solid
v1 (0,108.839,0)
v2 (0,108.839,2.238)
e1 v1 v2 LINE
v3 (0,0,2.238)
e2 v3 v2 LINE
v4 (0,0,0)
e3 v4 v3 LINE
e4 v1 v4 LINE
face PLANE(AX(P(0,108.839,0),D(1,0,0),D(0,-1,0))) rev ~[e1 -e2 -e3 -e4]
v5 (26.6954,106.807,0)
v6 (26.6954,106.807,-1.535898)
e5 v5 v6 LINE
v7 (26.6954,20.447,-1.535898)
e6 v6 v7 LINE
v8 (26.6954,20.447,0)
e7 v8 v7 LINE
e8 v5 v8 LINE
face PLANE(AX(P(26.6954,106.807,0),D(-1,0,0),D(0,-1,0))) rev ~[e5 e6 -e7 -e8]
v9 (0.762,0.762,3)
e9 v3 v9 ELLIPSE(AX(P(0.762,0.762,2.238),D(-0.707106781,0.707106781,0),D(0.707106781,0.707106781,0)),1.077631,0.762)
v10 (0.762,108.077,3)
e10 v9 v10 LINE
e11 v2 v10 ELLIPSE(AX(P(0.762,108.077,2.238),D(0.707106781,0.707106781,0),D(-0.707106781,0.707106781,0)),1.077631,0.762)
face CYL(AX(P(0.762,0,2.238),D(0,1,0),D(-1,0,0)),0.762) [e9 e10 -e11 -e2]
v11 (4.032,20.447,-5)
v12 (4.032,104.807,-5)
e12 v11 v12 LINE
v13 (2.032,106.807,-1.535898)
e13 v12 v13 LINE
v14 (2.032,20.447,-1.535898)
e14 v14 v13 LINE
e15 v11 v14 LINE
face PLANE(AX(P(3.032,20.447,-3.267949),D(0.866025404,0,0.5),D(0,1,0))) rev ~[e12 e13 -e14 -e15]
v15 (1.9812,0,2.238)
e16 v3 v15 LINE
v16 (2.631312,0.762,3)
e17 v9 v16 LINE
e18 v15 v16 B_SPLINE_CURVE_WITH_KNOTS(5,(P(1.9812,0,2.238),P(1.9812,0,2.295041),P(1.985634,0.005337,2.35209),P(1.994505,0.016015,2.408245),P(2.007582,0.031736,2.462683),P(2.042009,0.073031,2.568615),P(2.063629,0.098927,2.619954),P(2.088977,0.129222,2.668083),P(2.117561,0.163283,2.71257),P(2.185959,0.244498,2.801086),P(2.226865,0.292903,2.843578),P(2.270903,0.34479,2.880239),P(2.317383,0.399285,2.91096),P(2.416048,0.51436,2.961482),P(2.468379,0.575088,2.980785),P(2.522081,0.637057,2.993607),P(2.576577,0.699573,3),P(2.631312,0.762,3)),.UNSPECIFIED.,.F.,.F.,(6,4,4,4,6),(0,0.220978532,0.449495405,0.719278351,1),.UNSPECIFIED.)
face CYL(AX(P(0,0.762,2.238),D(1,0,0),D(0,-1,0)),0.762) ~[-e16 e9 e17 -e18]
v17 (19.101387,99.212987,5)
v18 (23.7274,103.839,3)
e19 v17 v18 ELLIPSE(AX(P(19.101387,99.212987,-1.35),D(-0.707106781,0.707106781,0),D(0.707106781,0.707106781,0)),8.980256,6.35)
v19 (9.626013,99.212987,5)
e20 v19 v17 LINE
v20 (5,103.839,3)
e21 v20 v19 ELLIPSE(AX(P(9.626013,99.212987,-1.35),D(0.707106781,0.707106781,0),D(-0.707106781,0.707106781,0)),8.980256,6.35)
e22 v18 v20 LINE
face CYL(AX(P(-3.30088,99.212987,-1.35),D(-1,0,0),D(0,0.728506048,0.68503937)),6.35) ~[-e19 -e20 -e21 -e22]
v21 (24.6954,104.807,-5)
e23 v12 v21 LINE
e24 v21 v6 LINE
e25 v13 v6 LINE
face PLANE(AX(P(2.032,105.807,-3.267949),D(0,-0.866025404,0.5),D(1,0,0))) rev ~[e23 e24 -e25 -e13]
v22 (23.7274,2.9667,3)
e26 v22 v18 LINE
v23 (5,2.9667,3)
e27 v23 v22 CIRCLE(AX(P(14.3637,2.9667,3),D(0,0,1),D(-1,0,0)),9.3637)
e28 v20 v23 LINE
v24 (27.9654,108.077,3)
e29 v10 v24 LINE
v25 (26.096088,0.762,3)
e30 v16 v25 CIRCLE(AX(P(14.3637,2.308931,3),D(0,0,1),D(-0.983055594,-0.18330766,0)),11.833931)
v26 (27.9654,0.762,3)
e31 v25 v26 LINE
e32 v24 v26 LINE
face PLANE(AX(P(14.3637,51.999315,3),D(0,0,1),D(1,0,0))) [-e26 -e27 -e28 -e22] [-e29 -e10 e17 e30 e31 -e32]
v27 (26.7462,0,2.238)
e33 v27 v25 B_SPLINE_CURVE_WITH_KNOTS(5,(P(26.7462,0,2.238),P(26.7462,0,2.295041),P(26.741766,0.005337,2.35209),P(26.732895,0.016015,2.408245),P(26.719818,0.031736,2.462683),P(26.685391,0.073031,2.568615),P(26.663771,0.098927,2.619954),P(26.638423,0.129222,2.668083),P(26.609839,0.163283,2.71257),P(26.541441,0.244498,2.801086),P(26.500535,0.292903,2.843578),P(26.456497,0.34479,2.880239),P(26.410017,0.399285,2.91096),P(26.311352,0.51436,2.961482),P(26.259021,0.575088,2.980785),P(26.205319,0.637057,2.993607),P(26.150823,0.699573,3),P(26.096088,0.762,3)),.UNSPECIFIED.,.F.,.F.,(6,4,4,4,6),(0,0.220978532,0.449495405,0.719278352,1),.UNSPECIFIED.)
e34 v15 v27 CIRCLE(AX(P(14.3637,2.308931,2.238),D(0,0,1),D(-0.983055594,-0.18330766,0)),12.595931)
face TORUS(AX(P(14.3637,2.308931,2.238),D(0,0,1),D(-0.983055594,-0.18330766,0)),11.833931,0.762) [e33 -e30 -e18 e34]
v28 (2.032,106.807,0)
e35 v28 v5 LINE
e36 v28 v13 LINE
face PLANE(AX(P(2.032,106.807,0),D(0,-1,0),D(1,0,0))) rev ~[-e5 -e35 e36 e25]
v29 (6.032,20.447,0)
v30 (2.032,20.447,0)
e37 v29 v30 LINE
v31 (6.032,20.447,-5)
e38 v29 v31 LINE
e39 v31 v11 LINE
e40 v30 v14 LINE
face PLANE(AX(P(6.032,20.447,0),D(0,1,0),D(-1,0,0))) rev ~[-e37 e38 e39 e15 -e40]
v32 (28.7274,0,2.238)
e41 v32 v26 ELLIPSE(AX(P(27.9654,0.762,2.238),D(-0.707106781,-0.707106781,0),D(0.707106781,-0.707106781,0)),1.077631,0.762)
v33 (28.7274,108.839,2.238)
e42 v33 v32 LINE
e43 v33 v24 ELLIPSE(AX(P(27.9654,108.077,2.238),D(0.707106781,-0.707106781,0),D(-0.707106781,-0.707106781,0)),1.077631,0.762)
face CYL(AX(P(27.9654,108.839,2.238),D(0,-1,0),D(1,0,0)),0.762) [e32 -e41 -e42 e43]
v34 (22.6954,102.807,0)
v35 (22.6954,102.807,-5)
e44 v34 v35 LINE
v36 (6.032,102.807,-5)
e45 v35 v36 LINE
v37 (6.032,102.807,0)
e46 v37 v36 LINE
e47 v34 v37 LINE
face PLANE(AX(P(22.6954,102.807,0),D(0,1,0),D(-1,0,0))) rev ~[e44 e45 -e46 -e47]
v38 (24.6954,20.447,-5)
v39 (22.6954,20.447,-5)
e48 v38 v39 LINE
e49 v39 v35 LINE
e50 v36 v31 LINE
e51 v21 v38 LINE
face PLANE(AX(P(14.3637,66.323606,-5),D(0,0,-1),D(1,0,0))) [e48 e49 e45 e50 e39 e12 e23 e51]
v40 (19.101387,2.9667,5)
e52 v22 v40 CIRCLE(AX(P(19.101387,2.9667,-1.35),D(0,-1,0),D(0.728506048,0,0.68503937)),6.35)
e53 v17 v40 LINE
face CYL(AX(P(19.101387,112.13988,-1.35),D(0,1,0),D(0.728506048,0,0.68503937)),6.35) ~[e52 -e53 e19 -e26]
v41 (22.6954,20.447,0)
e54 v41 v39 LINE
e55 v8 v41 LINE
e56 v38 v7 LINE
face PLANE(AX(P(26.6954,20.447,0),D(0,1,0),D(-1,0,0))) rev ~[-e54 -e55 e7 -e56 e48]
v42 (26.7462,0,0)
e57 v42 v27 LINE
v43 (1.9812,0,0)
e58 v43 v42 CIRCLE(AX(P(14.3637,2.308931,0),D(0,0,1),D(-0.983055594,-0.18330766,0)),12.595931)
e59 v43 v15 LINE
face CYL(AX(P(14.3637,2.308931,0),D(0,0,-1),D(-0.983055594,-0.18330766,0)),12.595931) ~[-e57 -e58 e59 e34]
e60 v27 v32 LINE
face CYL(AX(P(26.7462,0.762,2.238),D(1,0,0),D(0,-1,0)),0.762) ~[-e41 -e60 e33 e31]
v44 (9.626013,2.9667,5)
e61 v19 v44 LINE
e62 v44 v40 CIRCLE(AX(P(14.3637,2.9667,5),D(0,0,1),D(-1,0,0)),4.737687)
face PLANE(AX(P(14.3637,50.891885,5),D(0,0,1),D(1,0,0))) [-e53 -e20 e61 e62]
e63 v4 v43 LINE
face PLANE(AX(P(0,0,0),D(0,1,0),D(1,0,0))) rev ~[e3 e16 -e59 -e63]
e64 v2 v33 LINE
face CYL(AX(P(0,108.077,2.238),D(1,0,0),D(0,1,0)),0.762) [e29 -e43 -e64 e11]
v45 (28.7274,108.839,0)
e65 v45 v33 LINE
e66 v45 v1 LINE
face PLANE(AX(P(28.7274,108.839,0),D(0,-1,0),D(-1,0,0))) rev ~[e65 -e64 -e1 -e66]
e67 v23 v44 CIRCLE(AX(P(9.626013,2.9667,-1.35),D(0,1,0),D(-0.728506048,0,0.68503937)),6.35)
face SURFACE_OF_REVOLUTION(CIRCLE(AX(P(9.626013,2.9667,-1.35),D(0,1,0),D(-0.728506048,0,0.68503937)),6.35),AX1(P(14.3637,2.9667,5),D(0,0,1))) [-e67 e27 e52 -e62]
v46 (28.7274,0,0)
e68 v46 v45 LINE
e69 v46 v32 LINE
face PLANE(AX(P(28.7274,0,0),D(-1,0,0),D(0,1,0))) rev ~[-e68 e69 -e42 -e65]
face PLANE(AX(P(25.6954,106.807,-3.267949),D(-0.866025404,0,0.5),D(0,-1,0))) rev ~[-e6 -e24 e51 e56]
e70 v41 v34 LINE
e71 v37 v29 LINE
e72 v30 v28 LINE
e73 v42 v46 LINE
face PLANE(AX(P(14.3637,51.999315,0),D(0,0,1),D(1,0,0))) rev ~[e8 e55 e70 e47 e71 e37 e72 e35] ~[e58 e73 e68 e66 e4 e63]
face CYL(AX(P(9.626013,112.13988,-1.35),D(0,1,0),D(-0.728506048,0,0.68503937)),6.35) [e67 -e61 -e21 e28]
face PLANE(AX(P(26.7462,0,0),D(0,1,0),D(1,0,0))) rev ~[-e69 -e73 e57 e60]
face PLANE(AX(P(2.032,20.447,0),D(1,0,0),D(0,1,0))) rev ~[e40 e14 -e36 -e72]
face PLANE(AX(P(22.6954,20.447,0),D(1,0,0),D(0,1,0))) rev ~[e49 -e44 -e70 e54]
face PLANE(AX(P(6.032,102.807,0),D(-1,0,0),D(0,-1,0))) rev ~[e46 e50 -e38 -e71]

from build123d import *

# Parameters (mm, degrees)
F1_DEPTH    = 3
F3_DEPTH    = 5
F4_SIZE2    = 3.4641016151
F4_SIZE     = 2
F6_DEPTH    = 2
F6_TAPER    = 25
F7_T1_DEPTH = 109.1731798991
F7_T3_DEPTH = 35.3291597983
F7_T6_ANGLE = 180
F8_R        = 0.762


# Not quite as in the source:
# - a fillet or chamfer that OpenCascade refuses, or shapes differently, is made with other operations: its cross-section is extruded or revolved along the edge and cut away or added


with BuildPart() as f1:
    # F0 (on Top) → F1 (new body)
    with BuildSketch(Plane.XY):
        with BuildLine():
            Line((28.7274, 108.839), (0, 108.839))
            Line((0, 108.839), (0, 0))
            Line((0, 0), (1.9812, 0))
            ThreePointArc((1.9812, 0), (14.3637, -10.287), (26.7462, 0))
            Line((26.7462, 0), (28.7274, 0))
            Line((28.7274, 0), (28.7274, 108.839))
        make_face()
    extrude(amount=F1_DEPTH)

    # F2 (on face) → F3 (join)
    with BuildSketch(Plane(origin=(0, 0, 0), x_dir=(1, 0, 0), z_dir=(0, 0, -1))):
        Polygon((6.032, -20.447), (2.032, -20.447), (2.032, -106.807), (26.6954, -106.807), (26.6954, -20.447), (22.6954, -20.447), (22.6954, -102.807), (6.032, -102.807), align=None)
    extrude(amount=F3_DEPTH)

    # F4
    f4_edges = [f1.edges().sort_by_distance(p)[0] for p in [
        (2.032, 63.627, -5),
        (14.3637, 106.807, -5),
        (26.6954, 63.627, -5),
    ]]
    f4_side = f1.faces().sort_by_distance((4.032, 21.345128, -5))[0]
    chamfer(f4_edges, length=F4_SIZE, length2=F4_SIZE2, reference=f4_side)

    # F5 (on face) → F6 (join)
    with BuildSketch(Plane.XY.offset(3)):
        with BuildLine():
            Line((23.7274, 103.839), (5, 103.839))
            Line((5, 103.839), (5, 2.9667))
            ThreePointArc((5, 2.9667), (14.3637, -6.397), (23.7274, 2.9667))
            Line((23.7274, 2.9667), (23.7274, 103.839))
        make_face()
    extrude(amount=F6_DEPTH, taper=F6_TAPER)

    # F7: fillet of radius 6.35 on 4 edges, made by hand

    # F7_s2 → F7_t1 (cut)
    with BuildSketch(Plane.XZ.offset(-112.1398798991)):
        with BuildLine():
            ThreePointArc((23.7274, 3), (21.6213072312, 4.4785933123), (19.1013865975, 5))
            Line((19.1013865975, 5), (22.7947846837, 5))
            Line((22.7947846837, 5), (23.7274, 3))
        make_face()
        with BuildLine():
            ThreePointArc((5, 3), (7.1060927688, 4.4785933123), (9.6260134025, 5))
            Line((9.6260134025, 5), (5.9326153163, 5))
            Line((5.9326153163, 5), (5, 3))
        make_face()
    extrude(amount=F7_T1_DEPTH, mode=Mode.SUBTRACT)

    # F7_s4 → F7_t3 (cut)
    with BuildSketch(Plane.YZ.offset(-3.3008798991)):
        with BuildLine():
            ThreePointArc((103.839, 3), (101.7329072312, 4.4785933123), (99.2129865975, 5))
            Line((99.2129865975, 5), (102.9063846837, 5))
            Line((102.9063846837, 5), (103.839, 3))
        make_face()
    extrude(amount=F7_T3_DEPTH, mode=Mode.SUBTRACT)

    # F7_s5 → F7_t6 (revolve, cut)
    with BuildSketch(Plane.XZ.offset(-2.9667)):
        with BuildLine():
            ThreePointArc((5, 3), (7.1060927688, 4.4785933123), (9.6260134025, 5))
            Line((9.6260134025, 5), (5.9326153163, 5))
            Line((5.9326153163, 5), (5, 3))
        make_face()
    revolve(axis=Axis((14.3637, 2.9667, 5), (0, 0, 1)), revolution_arc=F7_T6_ANGLE, mode=Mode.SUBTRACT)

    # F8
    f8_edges = [f1.edges().sort_by_distance(p)[0] for p in [
        (0, 54.4195, 3),
        (0.9906, 0, 3),
        (14.3637, -10.287, 3),
        (27.7368, 0, 3),
        (28.7274, 54.4195, 3),
        (14.3637, 108.839, 3),
    ]]
    fillet(f8_edges, radius=F8_R)


solid = f1.part
